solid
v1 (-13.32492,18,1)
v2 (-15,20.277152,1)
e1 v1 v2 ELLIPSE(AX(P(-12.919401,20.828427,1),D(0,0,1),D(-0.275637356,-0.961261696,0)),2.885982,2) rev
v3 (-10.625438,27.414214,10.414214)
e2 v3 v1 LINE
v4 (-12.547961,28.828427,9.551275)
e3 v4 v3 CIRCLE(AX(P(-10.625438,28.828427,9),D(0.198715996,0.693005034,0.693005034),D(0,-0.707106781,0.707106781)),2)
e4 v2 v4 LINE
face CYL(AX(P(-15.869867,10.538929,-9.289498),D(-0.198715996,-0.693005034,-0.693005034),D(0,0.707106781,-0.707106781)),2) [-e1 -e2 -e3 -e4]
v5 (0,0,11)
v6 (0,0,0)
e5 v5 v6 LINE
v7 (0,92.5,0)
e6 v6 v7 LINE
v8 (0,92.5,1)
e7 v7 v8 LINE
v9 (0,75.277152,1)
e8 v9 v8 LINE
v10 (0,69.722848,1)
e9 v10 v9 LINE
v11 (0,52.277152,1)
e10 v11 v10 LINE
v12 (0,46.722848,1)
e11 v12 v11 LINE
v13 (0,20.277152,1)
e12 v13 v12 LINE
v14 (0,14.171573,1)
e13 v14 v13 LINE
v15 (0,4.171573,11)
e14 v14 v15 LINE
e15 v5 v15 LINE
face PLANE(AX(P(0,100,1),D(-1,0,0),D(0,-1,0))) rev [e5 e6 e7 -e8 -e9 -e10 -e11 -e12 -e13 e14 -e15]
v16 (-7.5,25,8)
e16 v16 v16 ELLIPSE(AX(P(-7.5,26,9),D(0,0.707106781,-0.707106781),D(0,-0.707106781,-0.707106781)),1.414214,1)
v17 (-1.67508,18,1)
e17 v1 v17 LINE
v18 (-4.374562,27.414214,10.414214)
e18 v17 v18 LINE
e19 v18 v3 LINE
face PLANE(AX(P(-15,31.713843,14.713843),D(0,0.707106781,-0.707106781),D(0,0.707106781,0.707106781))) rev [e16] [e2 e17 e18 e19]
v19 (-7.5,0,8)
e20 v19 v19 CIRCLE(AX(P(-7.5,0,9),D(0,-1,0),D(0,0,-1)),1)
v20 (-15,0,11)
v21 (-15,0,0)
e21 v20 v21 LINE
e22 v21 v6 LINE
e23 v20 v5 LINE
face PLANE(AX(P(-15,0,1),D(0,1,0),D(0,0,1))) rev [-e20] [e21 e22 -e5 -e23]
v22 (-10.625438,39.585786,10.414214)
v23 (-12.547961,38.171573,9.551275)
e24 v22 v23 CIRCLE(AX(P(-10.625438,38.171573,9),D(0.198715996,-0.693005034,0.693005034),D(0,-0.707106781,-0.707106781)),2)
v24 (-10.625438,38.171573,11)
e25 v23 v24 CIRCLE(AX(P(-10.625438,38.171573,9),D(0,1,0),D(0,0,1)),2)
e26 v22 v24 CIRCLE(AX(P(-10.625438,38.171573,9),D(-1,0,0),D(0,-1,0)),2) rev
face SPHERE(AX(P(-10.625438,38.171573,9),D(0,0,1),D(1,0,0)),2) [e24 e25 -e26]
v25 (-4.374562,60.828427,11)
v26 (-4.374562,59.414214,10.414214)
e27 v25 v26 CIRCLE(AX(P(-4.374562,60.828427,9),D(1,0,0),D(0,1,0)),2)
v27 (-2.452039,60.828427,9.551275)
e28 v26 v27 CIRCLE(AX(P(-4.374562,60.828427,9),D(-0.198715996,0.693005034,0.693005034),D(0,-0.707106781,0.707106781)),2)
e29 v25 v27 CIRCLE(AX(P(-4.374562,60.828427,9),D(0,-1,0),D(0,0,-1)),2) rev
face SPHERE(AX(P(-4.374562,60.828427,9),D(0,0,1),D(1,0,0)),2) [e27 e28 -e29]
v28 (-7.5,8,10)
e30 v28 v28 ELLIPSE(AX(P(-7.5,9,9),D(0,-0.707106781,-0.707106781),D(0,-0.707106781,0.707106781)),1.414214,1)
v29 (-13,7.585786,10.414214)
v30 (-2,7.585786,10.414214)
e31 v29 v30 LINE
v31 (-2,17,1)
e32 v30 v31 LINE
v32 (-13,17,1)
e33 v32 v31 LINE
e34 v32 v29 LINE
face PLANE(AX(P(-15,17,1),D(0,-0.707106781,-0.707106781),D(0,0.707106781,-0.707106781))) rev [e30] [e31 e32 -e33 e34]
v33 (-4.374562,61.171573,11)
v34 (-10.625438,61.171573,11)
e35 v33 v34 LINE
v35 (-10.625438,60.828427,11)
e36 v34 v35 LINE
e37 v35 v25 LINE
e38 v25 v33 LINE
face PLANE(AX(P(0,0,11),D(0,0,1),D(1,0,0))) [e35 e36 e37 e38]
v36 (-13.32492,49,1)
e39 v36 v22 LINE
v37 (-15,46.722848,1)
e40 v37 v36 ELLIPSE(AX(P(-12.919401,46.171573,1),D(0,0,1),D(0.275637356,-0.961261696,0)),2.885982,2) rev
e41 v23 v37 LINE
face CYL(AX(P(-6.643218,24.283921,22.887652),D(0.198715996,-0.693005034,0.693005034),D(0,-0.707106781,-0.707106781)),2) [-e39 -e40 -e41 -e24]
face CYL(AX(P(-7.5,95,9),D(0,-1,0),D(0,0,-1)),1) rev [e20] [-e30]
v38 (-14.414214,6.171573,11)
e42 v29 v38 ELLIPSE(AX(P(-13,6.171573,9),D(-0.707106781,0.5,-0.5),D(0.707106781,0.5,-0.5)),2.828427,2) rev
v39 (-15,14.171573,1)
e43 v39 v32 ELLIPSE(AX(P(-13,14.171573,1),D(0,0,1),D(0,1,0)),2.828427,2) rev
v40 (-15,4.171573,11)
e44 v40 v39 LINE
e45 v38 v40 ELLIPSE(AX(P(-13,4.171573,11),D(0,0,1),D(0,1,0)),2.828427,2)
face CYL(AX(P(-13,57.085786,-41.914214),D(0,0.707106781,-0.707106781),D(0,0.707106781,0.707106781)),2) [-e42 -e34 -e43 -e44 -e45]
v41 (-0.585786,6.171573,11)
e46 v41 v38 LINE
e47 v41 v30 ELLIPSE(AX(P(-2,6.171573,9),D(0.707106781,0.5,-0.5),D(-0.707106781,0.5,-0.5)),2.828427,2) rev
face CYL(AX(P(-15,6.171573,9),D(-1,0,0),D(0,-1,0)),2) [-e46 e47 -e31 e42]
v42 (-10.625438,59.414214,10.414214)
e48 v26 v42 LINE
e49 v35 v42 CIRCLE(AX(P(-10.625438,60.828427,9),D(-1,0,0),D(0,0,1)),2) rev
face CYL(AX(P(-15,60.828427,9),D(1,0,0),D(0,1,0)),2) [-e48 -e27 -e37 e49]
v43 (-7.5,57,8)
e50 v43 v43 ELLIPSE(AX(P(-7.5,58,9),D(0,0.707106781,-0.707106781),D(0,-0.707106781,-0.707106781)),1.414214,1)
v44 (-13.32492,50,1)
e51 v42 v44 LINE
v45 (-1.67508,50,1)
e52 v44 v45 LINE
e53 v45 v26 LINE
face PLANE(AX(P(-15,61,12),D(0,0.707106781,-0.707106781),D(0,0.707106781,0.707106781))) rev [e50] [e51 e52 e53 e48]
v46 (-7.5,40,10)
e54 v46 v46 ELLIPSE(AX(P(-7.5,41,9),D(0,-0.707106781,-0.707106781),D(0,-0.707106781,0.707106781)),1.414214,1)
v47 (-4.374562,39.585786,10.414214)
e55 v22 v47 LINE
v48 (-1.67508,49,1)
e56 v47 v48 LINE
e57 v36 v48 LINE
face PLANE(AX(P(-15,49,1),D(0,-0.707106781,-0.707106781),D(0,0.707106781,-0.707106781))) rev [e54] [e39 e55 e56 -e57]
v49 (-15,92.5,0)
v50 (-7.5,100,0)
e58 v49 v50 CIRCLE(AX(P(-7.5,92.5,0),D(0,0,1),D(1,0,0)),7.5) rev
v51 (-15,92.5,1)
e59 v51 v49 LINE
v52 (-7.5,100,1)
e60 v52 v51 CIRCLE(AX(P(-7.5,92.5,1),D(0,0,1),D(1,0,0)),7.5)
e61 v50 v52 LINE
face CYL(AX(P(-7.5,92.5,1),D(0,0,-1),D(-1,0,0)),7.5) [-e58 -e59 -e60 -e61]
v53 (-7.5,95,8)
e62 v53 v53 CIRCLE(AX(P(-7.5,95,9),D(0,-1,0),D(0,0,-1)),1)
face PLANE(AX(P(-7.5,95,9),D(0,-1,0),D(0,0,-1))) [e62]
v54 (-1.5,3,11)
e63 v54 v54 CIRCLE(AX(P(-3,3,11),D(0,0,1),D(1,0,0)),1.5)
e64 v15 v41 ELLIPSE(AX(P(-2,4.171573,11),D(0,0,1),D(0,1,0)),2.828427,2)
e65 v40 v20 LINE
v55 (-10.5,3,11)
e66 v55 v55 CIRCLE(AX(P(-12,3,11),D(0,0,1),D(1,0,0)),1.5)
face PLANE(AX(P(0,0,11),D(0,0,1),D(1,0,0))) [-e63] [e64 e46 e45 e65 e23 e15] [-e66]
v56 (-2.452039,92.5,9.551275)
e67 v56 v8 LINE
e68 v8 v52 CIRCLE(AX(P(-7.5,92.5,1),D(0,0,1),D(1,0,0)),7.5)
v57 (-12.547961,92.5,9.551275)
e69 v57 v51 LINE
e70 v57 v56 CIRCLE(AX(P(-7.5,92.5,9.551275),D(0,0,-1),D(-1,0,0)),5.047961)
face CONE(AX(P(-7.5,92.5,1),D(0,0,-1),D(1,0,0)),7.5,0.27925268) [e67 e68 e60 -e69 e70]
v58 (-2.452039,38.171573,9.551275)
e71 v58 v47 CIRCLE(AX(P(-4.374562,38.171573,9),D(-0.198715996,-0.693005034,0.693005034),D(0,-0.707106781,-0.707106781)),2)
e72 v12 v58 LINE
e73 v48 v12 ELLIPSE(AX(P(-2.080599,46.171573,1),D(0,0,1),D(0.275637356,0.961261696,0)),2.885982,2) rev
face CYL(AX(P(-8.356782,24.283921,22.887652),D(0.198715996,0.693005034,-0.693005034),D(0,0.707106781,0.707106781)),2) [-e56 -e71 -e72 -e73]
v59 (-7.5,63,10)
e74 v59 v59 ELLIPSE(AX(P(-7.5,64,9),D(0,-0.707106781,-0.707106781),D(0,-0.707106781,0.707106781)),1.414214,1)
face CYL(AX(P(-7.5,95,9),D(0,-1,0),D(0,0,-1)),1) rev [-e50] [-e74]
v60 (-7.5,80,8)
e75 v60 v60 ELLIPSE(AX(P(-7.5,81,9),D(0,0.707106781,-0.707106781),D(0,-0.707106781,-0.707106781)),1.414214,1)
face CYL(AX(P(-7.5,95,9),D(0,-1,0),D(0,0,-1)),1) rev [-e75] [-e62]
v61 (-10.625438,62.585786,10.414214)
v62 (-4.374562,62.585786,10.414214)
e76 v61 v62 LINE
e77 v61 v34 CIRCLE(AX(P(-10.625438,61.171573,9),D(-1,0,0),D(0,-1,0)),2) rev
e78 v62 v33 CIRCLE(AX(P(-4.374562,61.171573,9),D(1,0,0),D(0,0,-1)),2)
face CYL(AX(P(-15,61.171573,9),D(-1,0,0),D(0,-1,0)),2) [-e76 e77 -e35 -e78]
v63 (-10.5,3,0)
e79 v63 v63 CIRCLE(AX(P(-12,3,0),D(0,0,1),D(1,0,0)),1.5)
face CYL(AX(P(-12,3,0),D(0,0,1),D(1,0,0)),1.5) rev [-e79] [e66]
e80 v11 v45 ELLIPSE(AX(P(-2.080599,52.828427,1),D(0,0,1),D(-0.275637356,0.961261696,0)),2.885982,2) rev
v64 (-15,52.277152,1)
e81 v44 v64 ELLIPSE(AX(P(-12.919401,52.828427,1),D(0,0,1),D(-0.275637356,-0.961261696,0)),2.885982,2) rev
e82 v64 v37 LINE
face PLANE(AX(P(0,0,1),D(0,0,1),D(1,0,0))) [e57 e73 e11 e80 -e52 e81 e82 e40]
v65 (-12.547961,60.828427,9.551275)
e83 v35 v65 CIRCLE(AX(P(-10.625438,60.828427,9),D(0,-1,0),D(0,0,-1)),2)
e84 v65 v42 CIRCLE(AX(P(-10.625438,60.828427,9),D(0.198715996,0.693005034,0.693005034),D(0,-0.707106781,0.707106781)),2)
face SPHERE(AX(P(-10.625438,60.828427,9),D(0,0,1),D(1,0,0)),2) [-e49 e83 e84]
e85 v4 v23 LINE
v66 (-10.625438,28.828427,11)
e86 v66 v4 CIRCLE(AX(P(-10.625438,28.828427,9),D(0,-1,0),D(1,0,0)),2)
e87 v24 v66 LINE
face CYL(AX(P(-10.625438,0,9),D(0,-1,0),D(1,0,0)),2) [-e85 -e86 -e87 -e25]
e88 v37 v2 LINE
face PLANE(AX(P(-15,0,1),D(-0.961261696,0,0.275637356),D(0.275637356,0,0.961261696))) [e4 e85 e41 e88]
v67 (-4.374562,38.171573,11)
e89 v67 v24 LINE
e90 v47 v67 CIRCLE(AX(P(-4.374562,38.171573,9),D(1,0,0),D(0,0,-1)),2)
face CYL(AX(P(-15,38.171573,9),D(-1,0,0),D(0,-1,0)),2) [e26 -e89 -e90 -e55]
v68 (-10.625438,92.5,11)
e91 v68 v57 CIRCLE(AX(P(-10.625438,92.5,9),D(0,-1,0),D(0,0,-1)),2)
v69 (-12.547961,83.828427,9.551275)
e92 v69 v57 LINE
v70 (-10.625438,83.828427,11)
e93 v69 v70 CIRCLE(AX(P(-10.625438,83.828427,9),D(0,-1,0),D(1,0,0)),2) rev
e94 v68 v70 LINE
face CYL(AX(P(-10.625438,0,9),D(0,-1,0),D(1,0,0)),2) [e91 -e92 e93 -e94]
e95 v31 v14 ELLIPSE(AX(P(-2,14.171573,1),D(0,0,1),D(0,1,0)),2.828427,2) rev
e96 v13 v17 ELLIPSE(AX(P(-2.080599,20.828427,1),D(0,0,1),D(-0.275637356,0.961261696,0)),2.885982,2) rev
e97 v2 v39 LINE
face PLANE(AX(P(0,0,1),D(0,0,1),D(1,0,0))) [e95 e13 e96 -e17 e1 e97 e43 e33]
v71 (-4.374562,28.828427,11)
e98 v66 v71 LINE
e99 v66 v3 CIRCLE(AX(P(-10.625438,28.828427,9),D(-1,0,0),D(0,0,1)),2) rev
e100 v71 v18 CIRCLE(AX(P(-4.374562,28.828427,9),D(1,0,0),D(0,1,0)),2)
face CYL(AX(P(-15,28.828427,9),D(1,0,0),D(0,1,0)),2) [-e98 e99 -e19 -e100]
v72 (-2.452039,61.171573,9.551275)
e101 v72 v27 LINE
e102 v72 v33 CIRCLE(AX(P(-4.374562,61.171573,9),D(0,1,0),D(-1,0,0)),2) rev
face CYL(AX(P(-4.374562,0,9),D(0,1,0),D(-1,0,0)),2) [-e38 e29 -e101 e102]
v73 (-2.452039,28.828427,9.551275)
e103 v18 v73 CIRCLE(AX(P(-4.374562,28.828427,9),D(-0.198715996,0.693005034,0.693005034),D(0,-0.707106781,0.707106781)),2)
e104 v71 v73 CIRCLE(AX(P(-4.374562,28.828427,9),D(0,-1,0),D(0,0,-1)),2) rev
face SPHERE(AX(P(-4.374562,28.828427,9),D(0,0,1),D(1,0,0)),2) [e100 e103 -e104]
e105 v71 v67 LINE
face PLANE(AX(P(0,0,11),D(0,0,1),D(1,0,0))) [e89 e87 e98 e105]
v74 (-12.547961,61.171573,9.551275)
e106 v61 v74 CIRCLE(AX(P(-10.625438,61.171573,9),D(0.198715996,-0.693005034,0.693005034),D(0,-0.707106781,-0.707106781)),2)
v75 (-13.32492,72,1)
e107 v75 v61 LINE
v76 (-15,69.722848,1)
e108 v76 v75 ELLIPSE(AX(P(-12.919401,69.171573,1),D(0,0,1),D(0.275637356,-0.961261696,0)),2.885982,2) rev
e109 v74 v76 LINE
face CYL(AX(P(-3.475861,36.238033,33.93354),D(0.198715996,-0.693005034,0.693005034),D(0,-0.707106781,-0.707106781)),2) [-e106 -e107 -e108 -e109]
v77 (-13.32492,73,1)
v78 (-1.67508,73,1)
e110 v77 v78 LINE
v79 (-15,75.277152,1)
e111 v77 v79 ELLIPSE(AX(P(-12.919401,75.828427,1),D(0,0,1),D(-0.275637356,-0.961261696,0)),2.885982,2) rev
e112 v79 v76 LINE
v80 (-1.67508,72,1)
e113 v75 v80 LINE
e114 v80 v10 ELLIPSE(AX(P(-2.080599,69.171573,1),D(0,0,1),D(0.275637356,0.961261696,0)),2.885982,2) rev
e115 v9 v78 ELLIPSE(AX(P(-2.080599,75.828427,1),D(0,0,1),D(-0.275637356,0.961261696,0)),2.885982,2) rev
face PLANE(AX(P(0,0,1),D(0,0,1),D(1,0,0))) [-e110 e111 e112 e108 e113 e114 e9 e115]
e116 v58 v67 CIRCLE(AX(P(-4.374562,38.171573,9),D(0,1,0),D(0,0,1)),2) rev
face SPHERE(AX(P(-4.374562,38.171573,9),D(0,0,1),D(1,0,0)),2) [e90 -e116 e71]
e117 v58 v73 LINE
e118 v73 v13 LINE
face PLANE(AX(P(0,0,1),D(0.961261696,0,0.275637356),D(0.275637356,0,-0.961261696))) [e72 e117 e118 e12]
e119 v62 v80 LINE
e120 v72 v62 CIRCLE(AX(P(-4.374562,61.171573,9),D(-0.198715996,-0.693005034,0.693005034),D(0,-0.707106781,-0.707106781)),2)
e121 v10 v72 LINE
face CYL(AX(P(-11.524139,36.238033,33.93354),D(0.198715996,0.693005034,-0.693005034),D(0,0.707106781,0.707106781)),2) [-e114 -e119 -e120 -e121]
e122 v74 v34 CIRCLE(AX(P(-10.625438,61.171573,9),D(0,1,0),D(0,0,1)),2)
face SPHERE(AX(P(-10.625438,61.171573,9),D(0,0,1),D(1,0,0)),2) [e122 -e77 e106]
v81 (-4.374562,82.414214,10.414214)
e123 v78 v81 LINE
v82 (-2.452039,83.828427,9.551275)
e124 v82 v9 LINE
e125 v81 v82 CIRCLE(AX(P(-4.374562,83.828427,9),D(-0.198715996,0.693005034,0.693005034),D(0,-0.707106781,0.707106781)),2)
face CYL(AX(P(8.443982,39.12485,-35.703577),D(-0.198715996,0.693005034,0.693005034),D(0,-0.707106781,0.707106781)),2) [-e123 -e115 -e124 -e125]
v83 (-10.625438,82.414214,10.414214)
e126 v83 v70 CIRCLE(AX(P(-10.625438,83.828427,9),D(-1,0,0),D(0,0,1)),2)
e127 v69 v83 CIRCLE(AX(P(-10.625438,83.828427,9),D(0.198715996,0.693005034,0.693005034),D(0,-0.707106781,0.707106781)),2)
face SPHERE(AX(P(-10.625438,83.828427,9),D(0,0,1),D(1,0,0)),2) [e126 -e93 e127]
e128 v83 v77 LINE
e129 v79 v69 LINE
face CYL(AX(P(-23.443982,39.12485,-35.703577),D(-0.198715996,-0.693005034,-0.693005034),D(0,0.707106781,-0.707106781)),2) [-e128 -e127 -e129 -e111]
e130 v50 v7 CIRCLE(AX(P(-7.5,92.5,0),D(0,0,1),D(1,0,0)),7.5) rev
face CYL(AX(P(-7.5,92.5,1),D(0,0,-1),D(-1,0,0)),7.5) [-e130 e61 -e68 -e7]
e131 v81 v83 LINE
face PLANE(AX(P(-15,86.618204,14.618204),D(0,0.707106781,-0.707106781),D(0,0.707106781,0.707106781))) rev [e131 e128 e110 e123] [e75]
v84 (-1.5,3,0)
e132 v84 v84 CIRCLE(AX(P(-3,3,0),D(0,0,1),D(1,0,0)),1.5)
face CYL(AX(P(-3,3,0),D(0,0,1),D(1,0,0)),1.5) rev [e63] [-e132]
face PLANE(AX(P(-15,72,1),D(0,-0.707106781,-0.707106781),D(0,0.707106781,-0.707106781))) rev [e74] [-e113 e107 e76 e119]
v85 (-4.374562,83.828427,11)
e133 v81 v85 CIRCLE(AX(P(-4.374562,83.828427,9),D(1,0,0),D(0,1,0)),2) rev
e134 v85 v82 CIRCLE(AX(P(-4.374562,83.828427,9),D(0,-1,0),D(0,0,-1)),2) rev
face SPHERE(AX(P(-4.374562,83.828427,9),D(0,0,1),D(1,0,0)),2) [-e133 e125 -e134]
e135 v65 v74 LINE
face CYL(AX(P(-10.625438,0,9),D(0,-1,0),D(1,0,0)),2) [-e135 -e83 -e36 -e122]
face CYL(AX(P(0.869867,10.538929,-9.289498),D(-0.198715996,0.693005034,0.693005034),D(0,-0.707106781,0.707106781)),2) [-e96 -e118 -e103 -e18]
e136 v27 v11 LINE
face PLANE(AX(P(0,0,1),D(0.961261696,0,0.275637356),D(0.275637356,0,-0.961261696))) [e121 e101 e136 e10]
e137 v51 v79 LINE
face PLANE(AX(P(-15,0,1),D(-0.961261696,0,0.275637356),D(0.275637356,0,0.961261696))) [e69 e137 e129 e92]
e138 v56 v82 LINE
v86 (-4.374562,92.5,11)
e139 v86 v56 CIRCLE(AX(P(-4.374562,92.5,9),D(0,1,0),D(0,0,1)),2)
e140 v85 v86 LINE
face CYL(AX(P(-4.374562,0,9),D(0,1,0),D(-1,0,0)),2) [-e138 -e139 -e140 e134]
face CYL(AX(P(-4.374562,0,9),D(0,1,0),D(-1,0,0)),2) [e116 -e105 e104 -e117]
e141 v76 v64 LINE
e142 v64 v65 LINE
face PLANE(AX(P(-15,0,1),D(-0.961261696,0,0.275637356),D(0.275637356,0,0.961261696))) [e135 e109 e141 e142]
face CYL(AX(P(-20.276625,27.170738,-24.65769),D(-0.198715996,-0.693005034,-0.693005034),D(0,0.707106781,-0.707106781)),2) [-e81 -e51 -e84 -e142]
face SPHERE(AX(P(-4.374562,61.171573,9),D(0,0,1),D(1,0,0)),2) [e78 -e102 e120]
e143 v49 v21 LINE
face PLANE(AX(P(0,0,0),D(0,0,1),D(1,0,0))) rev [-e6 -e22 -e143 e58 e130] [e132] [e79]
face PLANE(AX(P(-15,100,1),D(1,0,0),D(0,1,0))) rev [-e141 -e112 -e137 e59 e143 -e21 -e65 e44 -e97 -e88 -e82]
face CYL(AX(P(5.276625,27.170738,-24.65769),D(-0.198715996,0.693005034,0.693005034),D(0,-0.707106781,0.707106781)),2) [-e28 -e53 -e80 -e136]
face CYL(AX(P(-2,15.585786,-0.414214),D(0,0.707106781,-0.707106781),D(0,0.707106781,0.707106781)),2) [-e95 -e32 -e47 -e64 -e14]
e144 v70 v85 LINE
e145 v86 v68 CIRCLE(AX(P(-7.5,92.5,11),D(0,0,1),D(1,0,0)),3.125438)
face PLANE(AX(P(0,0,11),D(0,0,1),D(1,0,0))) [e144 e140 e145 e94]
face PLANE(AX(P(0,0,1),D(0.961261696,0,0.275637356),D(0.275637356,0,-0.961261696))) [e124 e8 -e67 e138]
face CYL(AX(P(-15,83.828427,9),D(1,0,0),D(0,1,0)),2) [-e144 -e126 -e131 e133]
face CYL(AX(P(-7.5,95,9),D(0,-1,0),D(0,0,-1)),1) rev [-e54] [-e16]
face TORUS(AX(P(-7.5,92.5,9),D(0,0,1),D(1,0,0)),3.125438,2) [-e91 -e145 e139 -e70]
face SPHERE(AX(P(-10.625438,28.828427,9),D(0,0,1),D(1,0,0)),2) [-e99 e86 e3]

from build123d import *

# Parameters (mm, degrees)
SKETCH1_W                     = 15
SKETCH1_H                     = 100
BOSS_EXTRUDE1_DEPTH           = 1
FILLET1_R                     = 7.5
BOSS_EXTRUDE2_DEPTH           = 10
BOSS_EXTRUDE2_DRAFT           = 16
SKETCH3_W                     = 15
SKETCH3_H                     = 22
BOSS_EXTRUDE2_PROFILE_2_DEPTH = 10
BOSS_EXTRUDE2_PROFILE_2_DRAFT = 16
SKETCH3_H_2                   = 31
BOSS_EXTRUDE2_PROFILE_3_DEPTH = 10
BOSS_EXTRUDE2_PROFILE_3_DRAFT = 16
SKETCH3_3_W                   = 15
SKETCH3_3_H                   = 17
BOSS_EXTRUDE3_DEPTH           = 10
CUT_EXTRUDE1_DEPTH            = 102.71528892
SKETCH5_R                     = 1
CUT_EXTRUDE2_DEPTH            = 95
FILLET2_R                     = 2
SKETCH6_R                     = 1.5
CUT_EXTRUDE3_DEPTH            = 102.71528892


with BuildPart() as part:
    # Sketch1 → Boss-Extrude1 (new body)
    with BuildSketch(Plane.XY):
        with Locations((-7.5, 50)):
            Rectangle(SKETCH1_W, SKETCH1_H)
    extrude(amount=BOSS_EXTRUDE1_DEPTH)

    # Fillet1
    fillet1_edges = [part.edges().sort_by_distance(p)[0] for p in [
        (0, 100, 0.5),
        (-15, 100, 0.5),
    ]]
    fillet(fillet1_edges, radius=FILLET1_R - 0.0001)  # a hair under: the kernel refuses the full size


with BuildPart() as boss_extrude2_tool:
    # Sketch3 → Boss-Extrude2 (with draft: the straight prism first)
    with BuildSketch(Plane.XY.offset(1)):
        with BuildLine():
            ThreePointArc((-7.5, 100), (-12.803300859, 97.803300859), (-15, 92.5))
            Line((-15, 92.5), (-15, 73))
            Line((-15, 73), (0, 73))
            Line((0, 73), (0, 92.5))
            ThreePointArc((0, 92.5), (-2.196699141, 97.803300859), (-7.5, 100))
        make_face()
    extrude(amount=BOSS_EXTRUDE2_DEPTH)
    # Boss-Extrude2: the draft: its side faces are tilted about the plane it starts from
    boss_extrude2_sides = [boss_extrude2_tool.faces().sort_by_distance(p)[0] for p in [
        (-7.5, 100, 6),
        (-7.5, 73, 6),
        (0, 82.75, 6),
        (-15, 82.75, 6),
    ]]
    draft(boss_extrude2_sides, Plane.XY.offset(1), BOSS_EXTRUDE2_DRAFT)


with BuildPart() as part_1:
    add(part.part)

    # Boss-Extrude2: add boss_extrude2_tool
    add(boss_extrude2_tool.part)


with BuildPart() as boss_extrude2_profile_2_tool:
    # Sketch3 → Boss-Extrude2 profile 2 (with draft: the straight prism first)
    with BuildSketch(Plane.XY.offset(1)):
        with Locations((-7.5, 61)):
            Rectangle(SKETCH3_W, SKETCH3_H)
    extrude(amount=BOSS_EXTRUDE2_PROFILE_2_DEPTH)
    # Boss-Extrude2 profile 2: the draft: its side faces are tilted about the plane it starts from
    boss_extrude2_profile_2_sides = [boss_extrude2_profile_2_tool.faces().sort_by_distance(p)[0] for p in [
        (-7.5, 72, 6),
        (-15, 61, 6),
        (-7.5, 50, 6),
        (0, 61, 6),
    ]]
    draft(boss_extrude2_profile_2_sides, Plane.XY.offset(1), BOSS_EXTRUDE2_PROFILE_2_DRAFT)


with BuildPart() as part_2:
    add(part_1.part)

    # Boss-Extrude2 profile 2: add boss_extrude2_profile_2_tool
    add(boss_extrude2_profile_2_tool.part)


with BuildPart() as boss_extrude2_profile_3_tool:
    # Sketch3 → Boss-Extrude2 profile 3 (with draft: the straight prism first)
    with BuildSketch(Plane.XY.offset(1)):
        with Locations((-7.5, 33.5)):
            Rectangle(SKETCH3_W, SKETCH3_H_2)
    extrude(amount=BOSS_EXTRUDE2_PROFILE_3_DEPTH)
    # Boss-Extrude2 profile 3: the draft: its side faces are tilted about the plane it starts from
    boss_extrude2_profile_3_sides = [boss_extrude2_profile_3_tool.faces().sort_by_distance(p)[0] for p in [
        (-7.5, 18, 6),
        (0, 33.5, 6),
        (-7.5, 49, 6),
        (-15, 33.5, 6),
    ]]
    draft(boss_extrude2_profile_3_sides, Plane.XY.offset(1), BOSS_EXTRUDE2_PROFILE_3_DRAFT)


with BuildPart() as part_3:
    add(part_2.part)

    # Boss-Extrude2 profile 3: add boss_extrude2_profile_3_tool
    add(boss_extrude2_profile_3_tool.part)

    # Sketch3<3> → Boss-Extrude3 (add)
    with BuildSketch(Plane.XY.offset(1)):
        with Locations((-7.5, 8.5)):
            Rectangle(SKETCH3_3_W, SKETCH3_3_H)
    extrude(amount=BOSS_EXTRUDE3_DEPTH)

    # Sketch4 → Cut-Extrude1 (cut, through all)
    with BuildSketch(Plane(origin=(0, 0, 0), x_dir=(0, 0, -1), z_dir=(1, 0, 0))):
        Polygon((-14.618204018, 86.618204018), (-1, 73), (-1, 72), (-12, 61), (-1, 50), (-1, 49), (-14.71384308, 35.28615692), (-14.71384308, 31.71384308), (-1, 18), (-1, 17), (-14.311925723, 3.688074277), (-29.385419391, 3.688074277), (-29.385419391, 86.618204018), align=None)
    extrude(amount=-CUT_EXTRUDE1_DEPTH, mode=Mode.SUBTRACT)

    # Sketch5 → Cut-Extrude2 (cut)
    with BuildSketch(Plane.XZ):
        with Locations(Location((-7.5, 9, 0), (0, 0, 270))):
            Circle(SKETCH5_R)
    extrude(amount=-CUT_EXTRUDE2_DEPTH, mode=Mode.SUBTRACT)

    # Fillet2
    fillet2_edges = [part_3.edges().sort_by_distance(p)[0] for p in [
        (-15, 12, 6),
        (0, 12, 6),
        (-12.132546142, 87.75, 11),
        (-7.5, 97.132546142, 11),
        (-7.5, 7, 11),
        (-12.132546142, 33.5, 11),
        (-2.867453858, 33.5, 11),
        (-7.5, 28, 11),
        (-7.5, 39, 11),
        (-12.132546142, 61, 11),
        (-2.867453858, 61, 11),
        (-7.5, 60, 11),
        (-7.5, 62, 11),
        (-2.867453858, 87.75, 11),
        (-7.5, 83, 11),
        (-13.566273071, 78, 6),
        (-1.433726929, 78, 6),
        (-13.566273071, 67, 6),
        (-1.433726929, 67, 6),
        (-13.566273071, 55, 6),
        (-1.433726929, 55, 6),
        (-13.566273071, 44, 6),
        (-1.433726929, 44, 6),
        (-13.566273071, 23, 6),
        (-1.433726929, 23, 6),
    ]]
    fillet(fillet2_edges, radius=FILLET2_R)

    # Sketch6 → Cut-Extrude3 (cut, through all)
    with BuildSketch(Plane.XY.offset(11)):
        with Locations((-12, 3)):
            Circle(SKETCH6_R)
        with Locations((-3, 3)):
            Circle(SKETCH6_R)
    extrude(amount=-CUT_EXTRUDE3_DEPTH, mode=Mode.SUBTRACT)


solid = part_3.part
